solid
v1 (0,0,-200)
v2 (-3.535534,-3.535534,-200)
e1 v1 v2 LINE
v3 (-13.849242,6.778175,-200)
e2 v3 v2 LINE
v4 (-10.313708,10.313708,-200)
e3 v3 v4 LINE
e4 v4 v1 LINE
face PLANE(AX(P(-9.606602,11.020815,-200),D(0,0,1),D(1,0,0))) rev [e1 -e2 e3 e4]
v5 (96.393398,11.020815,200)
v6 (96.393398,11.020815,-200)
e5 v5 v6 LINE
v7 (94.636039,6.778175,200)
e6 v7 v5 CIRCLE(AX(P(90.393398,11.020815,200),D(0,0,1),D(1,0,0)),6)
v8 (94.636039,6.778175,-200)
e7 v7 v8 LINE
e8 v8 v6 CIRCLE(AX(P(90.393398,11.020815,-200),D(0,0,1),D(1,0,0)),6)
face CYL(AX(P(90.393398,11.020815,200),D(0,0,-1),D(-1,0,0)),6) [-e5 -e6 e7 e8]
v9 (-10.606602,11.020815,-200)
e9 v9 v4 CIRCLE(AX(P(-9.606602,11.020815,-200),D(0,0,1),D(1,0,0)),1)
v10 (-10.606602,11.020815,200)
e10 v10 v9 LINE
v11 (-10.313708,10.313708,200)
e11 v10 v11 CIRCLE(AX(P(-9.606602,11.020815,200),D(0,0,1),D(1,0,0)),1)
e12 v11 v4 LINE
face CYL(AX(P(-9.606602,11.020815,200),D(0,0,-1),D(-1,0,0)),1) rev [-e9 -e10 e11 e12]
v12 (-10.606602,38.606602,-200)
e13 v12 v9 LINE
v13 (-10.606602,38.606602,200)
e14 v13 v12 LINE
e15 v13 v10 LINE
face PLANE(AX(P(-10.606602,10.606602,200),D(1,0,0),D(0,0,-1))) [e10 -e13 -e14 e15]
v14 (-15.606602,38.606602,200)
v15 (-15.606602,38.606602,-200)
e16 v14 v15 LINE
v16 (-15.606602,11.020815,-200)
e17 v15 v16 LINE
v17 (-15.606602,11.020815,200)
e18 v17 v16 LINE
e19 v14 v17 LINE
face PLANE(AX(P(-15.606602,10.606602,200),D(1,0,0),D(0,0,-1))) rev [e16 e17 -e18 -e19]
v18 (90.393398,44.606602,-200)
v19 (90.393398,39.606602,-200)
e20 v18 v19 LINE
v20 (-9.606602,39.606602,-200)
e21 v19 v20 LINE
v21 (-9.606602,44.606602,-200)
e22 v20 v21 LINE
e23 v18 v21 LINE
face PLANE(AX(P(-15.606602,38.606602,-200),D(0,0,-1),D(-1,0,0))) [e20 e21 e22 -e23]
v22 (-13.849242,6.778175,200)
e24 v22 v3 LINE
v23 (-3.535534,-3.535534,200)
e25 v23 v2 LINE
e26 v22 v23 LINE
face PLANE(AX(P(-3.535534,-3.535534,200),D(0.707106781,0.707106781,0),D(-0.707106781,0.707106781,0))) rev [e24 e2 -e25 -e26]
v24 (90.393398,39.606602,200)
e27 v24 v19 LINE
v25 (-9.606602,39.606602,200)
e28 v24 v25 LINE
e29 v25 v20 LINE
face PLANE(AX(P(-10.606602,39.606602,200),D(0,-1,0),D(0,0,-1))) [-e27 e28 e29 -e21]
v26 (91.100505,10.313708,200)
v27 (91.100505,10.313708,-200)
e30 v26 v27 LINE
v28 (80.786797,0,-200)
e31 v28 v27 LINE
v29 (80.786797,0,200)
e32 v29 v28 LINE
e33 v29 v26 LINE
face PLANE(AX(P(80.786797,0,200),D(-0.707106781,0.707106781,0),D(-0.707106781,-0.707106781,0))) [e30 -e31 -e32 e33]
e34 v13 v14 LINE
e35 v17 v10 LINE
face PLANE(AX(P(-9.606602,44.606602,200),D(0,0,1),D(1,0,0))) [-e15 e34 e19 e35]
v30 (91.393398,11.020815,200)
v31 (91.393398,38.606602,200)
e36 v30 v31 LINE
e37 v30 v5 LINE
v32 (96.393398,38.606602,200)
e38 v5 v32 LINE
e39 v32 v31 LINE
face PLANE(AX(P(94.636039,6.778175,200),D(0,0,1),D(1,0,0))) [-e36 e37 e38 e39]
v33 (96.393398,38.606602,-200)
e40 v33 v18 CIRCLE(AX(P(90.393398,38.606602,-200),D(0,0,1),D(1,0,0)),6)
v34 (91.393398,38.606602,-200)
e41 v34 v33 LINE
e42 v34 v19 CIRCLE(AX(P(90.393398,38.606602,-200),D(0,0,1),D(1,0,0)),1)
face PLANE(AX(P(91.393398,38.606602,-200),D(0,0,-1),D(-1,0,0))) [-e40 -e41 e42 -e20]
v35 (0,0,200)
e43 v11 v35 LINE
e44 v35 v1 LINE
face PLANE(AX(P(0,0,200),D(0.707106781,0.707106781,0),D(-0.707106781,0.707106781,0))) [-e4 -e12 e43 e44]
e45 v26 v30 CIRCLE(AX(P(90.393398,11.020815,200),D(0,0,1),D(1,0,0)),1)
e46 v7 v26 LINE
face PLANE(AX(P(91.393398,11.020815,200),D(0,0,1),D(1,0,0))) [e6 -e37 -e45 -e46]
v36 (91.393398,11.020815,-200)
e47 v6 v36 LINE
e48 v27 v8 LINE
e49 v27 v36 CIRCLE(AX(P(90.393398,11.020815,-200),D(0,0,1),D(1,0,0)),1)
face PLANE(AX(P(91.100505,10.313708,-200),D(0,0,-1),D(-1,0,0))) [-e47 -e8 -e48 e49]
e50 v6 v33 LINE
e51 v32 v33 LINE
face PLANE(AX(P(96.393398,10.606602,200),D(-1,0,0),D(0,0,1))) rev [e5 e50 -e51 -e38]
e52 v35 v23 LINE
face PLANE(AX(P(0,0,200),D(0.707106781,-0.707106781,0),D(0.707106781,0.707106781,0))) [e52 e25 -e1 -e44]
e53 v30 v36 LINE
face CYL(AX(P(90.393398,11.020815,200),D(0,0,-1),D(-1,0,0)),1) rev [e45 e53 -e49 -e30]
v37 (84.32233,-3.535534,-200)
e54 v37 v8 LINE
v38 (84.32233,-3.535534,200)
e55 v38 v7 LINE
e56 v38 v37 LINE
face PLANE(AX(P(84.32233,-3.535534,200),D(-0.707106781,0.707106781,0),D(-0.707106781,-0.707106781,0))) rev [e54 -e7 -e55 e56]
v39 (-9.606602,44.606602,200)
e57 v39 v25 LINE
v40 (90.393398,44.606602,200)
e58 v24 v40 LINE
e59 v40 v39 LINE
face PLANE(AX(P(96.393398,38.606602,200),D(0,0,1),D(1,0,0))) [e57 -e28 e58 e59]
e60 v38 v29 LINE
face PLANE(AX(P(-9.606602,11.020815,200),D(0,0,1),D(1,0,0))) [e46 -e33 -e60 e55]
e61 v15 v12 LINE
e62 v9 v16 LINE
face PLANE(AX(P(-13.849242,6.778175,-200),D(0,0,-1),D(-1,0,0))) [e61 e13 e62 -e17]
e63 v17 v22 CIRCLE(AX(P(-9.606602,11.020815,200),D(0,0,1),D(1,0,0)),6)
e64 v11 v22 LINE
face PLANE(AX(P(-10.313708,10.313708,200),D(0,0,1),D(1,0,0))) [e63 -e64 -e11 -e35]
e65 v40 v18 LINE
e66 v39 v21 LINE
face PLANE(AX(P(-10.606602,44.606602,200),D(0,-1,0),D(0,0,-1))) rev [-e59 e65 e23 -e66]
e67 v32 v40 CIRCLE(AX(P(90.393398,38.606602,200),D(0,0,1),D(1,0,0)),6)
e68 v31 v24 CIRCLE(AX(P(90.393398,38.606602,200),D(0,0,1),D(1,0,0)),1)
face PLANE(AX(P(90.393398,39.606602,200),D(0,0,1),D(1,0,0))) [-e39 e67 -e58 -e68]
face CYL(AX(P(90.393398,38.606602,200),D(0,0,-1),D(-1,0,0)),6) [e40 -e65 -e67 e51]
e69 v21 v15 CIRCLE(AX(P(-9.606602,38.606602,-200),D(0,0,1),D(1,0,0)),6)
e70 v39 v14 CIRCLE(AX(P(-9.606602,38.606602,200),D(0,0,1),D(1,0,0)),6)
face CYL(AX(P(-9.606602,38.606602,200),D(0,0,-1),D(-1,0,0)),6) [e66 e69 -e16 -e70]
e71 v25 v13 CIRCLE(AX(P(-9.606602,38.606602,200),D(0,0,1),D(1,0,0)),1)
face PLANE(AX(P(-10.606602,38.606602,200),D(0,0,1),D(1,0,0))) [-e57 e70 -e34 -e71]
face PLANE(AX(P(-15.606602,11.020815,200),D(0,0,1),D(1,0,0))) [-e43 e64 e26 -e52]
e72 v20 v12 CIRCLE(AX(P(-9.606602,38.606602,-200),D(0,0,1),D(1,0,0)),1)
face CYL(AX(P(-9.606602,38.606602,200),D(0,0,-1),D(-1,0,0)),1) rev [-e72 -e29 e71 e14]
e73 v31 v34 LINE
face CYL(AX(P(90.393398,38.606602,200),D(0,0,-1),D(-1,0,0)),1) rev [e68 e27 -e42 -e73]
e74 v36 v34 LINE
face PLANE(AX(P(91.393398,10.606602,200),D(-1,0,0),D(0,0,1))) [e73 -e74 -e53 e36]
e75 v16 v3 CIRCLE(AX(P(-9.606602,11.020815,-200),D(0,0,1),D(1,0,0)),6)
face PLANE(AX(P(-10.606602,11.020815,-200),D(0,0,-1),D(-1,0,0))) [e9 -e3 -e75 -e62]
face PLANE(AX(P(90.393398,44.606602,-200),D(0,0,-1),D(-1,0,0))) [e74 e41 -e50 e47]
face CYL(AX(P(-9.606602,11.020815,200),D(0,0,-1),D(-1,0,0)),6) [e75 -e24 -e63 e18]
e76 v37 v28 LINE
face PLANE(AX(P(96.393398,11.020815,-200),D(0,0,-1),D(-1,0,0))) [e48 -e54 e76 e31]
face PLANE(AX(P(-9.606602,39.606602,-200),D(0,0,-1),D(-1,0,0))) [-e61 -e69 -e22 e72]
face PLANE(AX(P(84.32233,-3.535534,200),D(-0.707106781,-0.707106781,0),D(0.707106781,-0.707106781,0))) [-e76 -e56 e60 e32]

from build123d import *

# Parameters (mm, degrees)
BASE_FLANGE1_DEPTH = 200


# Sheet-metal steps are written as plain solids
with BuildPart() as part:
    # Sketch1 → Base-Flange1 (new, symmetric)
    with BuildSketch(Plane.XY):
        with BuildLine():
            Line((0, 0), (-10.313708499, 10.313708499))
            ThreePointArc((-10.313708499, 10.313708499), (-10.53048125, 10.638131848), (-10.606601718, 11.02081528))
            Line((-10.606601718, 11.02081528), (-10.606601718, 38.606601718))
            ThreePointArc((-10.606601718, 38.606601718), (-10.313708499, 39.313708499), (-9.606601718, 39.606601718))
            Line((-9.606601718, 39.606601718), (90.393398282, 39.606601718))
            ThreePointArc((90.393398282, 39.606601718), (91.100505063, 39.313708499), (91.393398282, 38.606601718))
            Line((91.393398282, 38.606601718), (91.393398282, 11.02081528))
            ThreePointArc((91.393398282, 11.02081528), (91.317277815, 10.638131848), (91.100505063, 10.313708499))
            Line((91.100505063, 10.313708499), (80.786796564, 0))
            Line((80.786796564, 0), (84.32233047, -3.535533906))
            Line((84.32233047, -3.535533906), (94.636038969, 6.778174593))
            ThreePointArc((94.636038969, 6.778174593), (95.936675477, 8.724714686), (96.393398282, 11.02081528))
            Line((96.393398282, 11.02081528), (96.393398282, 38.606601718))
            ThreePointArc((96.393398282, 38.606601718), (94.636038969, 42.849242405), (90.393398282, 44.606601718))
            Line((90.393398282, 44.606601718), (-9.606601718, 44.606601718))
            ThreePointArc((-9.606601718, 44.606601718), (-13.849242405, 42.849242405), (-15.606601718, 38.606601718))
            Line((-15.606601718, 38.606601718), (-15.606601718, 11.02081528))
            ThreePointArc((-15.606601718, 11.02081528), (-15.149878913, 8.724714686), (-13.849242405, 6.778174593))
            Line((-13.849242405, 6.778174593), (-3.535533906, -3.535533906))
            Line((-3.535533906, -3.535533906), (0, 0))
        make_face()
    extrude(amount=BASE_FLANGE1_DEPTH, both=True)


solid = part.part
